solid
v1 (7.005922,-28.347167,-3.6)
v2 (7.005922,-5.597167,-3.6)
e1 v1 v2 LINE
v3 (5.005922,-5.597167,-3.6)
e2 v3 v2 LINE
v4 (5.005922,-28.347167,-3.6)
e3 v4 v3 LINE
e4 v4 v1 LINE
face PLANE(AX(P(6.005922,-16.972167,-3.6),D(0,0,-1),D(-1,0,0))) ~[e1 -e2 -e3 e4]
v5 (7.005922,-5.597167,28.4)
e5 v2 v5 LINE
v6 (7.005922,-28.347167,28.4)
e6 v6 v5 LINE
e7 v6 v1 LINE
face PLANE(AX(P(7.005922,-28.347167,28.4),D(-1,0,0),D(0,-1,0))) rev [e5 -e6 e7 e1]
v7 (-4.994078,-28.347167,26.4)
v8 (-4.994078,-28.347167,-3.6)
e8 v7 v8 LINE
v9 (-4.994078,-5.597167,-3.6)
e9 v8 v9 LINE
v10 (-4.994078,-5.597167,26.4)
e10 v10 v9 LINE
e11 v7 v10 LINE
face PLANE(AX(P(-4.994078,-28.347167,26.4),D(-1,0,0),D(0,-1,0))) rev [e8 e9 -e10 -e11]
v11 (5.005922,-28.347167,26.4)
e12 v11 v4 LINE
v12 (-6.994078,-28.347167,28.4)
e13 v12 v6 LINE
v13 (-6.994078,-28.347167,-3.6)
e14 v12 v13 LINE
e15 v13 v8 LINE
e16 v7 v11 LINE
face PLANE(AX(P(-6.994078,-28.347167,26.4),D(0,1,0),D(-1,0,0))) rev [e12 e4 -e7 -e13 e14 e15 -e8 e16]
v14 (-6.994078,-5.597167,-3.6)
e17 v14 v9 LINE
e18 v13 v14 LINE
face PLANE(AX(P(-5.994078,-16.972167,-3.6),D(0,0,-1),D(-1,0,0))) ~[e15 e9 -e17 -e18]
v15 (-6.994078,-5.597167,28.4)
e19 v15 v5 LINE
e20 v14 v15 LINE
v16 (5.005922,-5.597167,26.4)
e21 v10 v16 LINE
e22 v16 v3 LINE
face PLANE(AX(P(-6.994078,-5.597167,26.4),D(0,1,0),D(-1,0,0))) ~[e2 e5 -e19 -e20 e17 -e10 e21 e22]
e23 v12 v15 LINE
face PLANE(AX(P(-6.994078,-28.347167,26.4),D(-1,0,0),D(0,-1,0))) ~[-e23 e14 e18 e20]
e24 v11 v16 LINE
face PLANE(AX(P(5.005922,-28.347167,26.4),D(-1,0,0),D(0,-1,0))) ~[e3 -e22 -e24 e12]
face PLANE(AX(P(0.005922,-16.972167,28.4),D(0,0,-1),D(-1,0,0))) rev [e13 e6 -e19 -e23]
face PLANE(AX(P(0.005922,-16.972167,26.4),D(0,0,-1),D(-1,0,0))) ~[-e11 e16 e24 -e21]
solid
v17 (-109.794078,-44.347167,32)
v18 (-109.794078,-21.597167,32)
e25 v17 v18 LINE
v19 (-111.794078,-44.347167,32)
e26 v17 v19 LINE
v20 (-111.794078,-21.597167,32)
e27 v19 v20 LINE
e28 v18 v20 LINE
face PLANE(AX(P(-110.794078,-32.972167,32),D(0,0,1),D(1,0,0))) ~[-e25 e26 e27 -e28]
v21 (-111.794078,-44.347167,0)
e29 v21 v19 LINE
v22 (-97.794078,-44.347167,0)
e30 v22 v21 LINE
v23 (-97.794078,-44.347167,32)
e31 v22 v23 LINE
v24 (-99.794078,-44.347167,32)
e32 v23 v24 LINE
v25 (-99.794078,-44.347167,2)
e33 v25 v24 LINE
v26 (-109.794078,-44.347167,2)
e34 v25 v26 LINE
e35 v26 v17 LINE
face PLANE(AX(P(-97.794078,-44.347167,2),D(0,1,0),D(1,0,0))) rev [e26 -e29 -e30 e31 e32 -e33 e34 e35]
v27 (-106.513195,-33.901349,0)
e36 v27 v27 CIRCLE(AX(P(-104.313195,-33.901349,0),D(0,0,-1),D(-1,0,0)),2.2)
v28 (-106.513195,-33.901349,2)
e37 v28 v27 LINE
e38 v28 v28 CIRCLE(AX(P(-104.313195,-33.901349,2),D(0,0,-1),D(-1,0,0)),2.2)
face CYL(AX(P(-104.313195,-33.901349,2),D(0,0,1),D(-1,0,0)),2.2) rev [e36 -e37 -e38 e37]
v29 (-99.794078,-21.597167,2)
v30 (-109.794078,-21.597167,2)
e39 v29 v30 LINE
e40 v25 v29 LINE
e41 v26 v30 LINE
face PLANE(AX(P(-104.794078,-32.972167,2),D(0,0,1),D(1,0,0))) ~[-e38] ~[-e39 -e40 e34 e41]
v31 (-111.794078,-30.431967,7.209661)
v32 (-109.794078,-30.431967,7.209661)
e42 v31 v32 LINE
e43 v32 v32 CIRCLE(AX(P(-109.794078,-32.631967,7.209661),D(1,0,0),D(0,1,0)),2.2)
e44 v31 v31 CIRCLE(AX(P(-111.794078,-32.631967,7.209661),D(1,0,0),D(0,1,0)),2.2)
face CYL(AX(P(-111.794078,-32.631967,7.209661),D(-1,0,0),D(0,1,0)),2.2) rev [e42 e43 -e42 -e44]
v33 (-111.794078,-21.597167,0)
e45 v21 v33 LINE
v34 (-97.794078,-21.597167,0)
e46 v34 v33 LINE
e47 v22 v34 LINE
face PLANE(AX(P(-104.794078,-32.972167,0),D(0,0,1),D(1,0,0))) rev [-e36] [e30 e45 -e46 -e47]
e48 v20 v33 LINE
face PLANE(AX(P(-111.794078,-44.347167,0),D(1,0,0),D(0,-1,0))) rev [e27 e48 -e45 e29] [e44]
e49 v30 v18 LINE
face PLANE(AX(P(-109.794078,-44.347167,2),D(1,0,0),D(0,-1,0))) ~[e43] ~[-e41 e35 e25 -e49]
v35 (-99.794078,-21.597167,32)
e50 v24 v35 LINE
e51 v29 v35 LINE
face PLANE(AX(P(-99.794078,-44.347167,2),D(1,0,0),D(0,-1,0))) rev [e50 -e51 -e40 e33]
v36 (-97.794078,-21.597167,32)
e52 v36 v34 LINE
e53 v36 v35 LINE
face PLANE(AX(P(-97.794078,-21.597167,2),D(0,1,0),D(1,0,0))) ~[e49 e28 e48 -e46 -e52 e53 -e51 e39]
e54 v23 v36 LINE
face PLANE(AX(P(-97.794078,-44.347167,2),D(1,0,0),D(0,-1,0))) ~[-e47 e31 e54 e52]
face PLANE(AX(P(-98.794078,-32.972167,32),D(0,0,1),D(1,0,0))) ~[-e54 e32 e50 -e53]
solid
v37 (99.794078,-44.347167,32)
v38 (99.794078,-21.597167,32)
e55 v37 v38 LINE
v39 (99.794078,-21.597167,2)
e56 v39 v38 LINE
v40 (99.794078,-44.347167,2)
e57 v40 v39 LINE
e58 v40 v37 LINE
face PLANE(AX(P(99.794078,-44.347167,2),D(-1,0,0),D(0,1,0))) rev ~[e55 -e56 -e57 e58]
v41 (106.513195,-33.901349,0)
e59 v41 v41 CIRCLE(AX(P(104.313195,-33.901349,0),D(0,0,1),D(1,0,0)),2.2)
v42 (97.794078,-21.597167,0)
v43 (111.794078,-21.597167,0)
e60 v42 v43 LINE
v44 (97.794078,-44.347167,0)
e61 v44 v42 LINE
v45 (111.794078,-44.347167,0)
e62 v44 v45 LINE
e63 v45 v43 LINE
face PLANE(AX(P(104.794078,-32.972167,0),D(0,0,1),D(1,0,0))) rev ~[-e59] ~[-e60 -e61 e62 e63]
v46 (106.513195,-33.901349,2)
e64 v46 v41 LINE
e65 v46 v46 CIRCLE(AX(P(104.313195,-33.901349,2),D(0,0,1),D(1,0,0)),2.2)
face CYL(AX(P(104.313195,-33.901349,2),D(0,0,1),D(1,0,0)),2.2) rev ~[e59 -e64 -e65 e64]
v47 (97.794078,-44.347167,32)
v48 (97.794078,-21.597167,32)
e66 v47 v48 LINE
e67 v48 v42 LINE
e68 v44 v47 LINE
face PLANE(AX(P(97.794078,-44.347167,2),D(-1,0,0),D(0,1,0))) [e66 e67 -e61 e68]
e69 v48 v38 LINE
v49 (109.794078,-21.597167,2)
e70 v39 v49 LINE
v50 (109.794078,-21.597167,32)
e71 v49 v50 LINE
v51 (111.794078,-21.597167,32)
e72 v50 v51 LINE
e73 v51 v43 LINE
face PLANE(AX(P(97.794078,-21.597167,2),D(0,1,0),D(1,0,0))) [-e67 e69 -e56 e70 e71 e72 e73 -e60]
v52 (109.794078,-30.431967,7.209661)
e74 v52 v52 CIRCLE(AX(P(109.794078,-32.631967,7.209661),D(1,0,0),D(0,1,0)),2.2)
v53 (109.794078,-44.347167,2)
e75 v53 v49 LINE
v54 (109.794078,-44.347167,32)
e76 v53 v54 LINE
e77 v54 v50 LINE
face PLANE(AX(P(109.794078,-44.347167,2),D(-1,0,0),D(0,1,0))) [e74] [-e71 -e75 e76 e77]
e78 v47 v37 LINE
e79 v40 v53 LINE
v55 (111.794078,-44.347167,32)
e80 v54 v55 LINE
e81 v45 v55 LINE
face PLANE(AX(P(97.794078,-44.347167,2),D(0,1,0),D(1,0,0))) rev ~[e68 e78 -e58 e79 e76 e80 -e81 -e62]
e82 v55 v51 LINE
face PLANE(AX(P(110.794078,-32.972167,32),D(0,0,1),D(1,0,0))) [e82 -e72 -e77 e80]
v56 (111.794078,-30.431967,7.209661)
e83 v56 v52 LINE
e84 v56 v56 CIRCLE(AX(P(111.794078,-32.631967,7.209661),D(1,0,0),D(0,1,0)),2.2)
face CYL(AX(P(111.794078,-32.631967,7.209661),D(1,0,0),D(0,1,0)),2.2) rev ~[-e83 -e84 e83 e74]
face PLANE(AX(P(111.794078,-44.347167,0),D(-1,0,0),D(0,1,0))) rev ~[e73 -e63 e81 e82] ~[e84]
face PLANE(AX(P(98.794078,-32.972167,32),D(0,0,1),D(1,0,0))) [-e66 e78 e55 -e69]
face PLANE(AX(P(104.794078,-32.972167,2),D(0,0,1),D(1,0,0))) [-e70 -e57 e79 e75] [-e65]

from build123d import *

# Parameters (mm, degrees)
F1_W      = 14
F1_H      = 22.75
F2_DEPTH  = 2
F3_W      = 2
F3_H      = 22.75
F4_DEPTH  = 30
F5_R      = 2.2
F6_DEPTH  = 2
F7_R      = 2.2
F8_DEPTH  = 2
F10_ANGLE = 180
F13_W     = 7.1573019959
F13_H     = 10.3748198599
F14_DEPTH = 2
F16_W     = 18.6804127879
F16_H     = 9.1584324837
F17_DEPTH = 2


with BuildPart() as f2:
    # F1 (on Top) → F2 (new body)
    with BuildSketch(Plane.XY):
        with Locations((104.7940782905, -32.9721670151)):
            Rectangle(F1_W, F1_H)
    extrude(amount=F2_DEPTH)

    # F3 (on face) → F4 (join)
    with BuildSketch(Plane.XY.offset(2)):
        with Locations((98.7940782905, -32.9721670151)):
            Rectangle(F3_W, F3_H)
        with Locations((110.7940782905, -32.9721670151)):
            Rectangle(F3_W, F3_H)
    extrude(amount=F4_DEPTH)

    # F5 (on face) → F6 (cut, through all)
    with BuildSketch(Plane.YZ.offset(111.7940782905)):
        with Locations((-32.6319672167, 7.209660951)):
            Circle(F5_R)
    extrude(amount=-F6_DEPTH, mode=Mode.SUBTRACT)

    # F7 (on face) → F8 (cut, through all)
    with BuildSketch(Plane.XY.offset(2)):
        with Locations((104.3131947517, -33.9013487101)):
            Circle(F7_R)
    extrude(amount=-F8_DEPTH, mode=Mode.SUBTRACT)


with BuildPart() as f9_1:
    # F9: instance of F2
    add(f2.part.mirror(Plane.YZ))


with BuildPart() as f10_1:
    # F10: copy of F9_1
    add(f9_1.part.rotate(Axis((-97.7940782905, -32.9721670151, 0), (0, 1, 0)), F10_ANGLE))


with BuildPart() as f10_1_1:
    # F11: moved
    add(f10_1.part.moved(Location((90.8, 16, 28.4))))

    # F13 (on offset) → F14 (join, through all)
    with BuildSketch(Plane.XY.offset(28.4)):
        with Locations((-0.1049609855, -17.7491279319)):
            Rectangle(F13_W, F13_H)
    extrude(amount=-F14_DEPTH)

    # F16 (on offset) → F17 (join, through all)
    with BuildSketch(Plane.YZ.offset(7.0059217095)):
        with Locations((-16.3181161042, 20.9184978157)):
            Rectangle(F16_W, F16_H)
    extrude(amount=-F17_DEPTH)


solid = Compound([f2.part, f9_1.part, f10_1_1.part])
